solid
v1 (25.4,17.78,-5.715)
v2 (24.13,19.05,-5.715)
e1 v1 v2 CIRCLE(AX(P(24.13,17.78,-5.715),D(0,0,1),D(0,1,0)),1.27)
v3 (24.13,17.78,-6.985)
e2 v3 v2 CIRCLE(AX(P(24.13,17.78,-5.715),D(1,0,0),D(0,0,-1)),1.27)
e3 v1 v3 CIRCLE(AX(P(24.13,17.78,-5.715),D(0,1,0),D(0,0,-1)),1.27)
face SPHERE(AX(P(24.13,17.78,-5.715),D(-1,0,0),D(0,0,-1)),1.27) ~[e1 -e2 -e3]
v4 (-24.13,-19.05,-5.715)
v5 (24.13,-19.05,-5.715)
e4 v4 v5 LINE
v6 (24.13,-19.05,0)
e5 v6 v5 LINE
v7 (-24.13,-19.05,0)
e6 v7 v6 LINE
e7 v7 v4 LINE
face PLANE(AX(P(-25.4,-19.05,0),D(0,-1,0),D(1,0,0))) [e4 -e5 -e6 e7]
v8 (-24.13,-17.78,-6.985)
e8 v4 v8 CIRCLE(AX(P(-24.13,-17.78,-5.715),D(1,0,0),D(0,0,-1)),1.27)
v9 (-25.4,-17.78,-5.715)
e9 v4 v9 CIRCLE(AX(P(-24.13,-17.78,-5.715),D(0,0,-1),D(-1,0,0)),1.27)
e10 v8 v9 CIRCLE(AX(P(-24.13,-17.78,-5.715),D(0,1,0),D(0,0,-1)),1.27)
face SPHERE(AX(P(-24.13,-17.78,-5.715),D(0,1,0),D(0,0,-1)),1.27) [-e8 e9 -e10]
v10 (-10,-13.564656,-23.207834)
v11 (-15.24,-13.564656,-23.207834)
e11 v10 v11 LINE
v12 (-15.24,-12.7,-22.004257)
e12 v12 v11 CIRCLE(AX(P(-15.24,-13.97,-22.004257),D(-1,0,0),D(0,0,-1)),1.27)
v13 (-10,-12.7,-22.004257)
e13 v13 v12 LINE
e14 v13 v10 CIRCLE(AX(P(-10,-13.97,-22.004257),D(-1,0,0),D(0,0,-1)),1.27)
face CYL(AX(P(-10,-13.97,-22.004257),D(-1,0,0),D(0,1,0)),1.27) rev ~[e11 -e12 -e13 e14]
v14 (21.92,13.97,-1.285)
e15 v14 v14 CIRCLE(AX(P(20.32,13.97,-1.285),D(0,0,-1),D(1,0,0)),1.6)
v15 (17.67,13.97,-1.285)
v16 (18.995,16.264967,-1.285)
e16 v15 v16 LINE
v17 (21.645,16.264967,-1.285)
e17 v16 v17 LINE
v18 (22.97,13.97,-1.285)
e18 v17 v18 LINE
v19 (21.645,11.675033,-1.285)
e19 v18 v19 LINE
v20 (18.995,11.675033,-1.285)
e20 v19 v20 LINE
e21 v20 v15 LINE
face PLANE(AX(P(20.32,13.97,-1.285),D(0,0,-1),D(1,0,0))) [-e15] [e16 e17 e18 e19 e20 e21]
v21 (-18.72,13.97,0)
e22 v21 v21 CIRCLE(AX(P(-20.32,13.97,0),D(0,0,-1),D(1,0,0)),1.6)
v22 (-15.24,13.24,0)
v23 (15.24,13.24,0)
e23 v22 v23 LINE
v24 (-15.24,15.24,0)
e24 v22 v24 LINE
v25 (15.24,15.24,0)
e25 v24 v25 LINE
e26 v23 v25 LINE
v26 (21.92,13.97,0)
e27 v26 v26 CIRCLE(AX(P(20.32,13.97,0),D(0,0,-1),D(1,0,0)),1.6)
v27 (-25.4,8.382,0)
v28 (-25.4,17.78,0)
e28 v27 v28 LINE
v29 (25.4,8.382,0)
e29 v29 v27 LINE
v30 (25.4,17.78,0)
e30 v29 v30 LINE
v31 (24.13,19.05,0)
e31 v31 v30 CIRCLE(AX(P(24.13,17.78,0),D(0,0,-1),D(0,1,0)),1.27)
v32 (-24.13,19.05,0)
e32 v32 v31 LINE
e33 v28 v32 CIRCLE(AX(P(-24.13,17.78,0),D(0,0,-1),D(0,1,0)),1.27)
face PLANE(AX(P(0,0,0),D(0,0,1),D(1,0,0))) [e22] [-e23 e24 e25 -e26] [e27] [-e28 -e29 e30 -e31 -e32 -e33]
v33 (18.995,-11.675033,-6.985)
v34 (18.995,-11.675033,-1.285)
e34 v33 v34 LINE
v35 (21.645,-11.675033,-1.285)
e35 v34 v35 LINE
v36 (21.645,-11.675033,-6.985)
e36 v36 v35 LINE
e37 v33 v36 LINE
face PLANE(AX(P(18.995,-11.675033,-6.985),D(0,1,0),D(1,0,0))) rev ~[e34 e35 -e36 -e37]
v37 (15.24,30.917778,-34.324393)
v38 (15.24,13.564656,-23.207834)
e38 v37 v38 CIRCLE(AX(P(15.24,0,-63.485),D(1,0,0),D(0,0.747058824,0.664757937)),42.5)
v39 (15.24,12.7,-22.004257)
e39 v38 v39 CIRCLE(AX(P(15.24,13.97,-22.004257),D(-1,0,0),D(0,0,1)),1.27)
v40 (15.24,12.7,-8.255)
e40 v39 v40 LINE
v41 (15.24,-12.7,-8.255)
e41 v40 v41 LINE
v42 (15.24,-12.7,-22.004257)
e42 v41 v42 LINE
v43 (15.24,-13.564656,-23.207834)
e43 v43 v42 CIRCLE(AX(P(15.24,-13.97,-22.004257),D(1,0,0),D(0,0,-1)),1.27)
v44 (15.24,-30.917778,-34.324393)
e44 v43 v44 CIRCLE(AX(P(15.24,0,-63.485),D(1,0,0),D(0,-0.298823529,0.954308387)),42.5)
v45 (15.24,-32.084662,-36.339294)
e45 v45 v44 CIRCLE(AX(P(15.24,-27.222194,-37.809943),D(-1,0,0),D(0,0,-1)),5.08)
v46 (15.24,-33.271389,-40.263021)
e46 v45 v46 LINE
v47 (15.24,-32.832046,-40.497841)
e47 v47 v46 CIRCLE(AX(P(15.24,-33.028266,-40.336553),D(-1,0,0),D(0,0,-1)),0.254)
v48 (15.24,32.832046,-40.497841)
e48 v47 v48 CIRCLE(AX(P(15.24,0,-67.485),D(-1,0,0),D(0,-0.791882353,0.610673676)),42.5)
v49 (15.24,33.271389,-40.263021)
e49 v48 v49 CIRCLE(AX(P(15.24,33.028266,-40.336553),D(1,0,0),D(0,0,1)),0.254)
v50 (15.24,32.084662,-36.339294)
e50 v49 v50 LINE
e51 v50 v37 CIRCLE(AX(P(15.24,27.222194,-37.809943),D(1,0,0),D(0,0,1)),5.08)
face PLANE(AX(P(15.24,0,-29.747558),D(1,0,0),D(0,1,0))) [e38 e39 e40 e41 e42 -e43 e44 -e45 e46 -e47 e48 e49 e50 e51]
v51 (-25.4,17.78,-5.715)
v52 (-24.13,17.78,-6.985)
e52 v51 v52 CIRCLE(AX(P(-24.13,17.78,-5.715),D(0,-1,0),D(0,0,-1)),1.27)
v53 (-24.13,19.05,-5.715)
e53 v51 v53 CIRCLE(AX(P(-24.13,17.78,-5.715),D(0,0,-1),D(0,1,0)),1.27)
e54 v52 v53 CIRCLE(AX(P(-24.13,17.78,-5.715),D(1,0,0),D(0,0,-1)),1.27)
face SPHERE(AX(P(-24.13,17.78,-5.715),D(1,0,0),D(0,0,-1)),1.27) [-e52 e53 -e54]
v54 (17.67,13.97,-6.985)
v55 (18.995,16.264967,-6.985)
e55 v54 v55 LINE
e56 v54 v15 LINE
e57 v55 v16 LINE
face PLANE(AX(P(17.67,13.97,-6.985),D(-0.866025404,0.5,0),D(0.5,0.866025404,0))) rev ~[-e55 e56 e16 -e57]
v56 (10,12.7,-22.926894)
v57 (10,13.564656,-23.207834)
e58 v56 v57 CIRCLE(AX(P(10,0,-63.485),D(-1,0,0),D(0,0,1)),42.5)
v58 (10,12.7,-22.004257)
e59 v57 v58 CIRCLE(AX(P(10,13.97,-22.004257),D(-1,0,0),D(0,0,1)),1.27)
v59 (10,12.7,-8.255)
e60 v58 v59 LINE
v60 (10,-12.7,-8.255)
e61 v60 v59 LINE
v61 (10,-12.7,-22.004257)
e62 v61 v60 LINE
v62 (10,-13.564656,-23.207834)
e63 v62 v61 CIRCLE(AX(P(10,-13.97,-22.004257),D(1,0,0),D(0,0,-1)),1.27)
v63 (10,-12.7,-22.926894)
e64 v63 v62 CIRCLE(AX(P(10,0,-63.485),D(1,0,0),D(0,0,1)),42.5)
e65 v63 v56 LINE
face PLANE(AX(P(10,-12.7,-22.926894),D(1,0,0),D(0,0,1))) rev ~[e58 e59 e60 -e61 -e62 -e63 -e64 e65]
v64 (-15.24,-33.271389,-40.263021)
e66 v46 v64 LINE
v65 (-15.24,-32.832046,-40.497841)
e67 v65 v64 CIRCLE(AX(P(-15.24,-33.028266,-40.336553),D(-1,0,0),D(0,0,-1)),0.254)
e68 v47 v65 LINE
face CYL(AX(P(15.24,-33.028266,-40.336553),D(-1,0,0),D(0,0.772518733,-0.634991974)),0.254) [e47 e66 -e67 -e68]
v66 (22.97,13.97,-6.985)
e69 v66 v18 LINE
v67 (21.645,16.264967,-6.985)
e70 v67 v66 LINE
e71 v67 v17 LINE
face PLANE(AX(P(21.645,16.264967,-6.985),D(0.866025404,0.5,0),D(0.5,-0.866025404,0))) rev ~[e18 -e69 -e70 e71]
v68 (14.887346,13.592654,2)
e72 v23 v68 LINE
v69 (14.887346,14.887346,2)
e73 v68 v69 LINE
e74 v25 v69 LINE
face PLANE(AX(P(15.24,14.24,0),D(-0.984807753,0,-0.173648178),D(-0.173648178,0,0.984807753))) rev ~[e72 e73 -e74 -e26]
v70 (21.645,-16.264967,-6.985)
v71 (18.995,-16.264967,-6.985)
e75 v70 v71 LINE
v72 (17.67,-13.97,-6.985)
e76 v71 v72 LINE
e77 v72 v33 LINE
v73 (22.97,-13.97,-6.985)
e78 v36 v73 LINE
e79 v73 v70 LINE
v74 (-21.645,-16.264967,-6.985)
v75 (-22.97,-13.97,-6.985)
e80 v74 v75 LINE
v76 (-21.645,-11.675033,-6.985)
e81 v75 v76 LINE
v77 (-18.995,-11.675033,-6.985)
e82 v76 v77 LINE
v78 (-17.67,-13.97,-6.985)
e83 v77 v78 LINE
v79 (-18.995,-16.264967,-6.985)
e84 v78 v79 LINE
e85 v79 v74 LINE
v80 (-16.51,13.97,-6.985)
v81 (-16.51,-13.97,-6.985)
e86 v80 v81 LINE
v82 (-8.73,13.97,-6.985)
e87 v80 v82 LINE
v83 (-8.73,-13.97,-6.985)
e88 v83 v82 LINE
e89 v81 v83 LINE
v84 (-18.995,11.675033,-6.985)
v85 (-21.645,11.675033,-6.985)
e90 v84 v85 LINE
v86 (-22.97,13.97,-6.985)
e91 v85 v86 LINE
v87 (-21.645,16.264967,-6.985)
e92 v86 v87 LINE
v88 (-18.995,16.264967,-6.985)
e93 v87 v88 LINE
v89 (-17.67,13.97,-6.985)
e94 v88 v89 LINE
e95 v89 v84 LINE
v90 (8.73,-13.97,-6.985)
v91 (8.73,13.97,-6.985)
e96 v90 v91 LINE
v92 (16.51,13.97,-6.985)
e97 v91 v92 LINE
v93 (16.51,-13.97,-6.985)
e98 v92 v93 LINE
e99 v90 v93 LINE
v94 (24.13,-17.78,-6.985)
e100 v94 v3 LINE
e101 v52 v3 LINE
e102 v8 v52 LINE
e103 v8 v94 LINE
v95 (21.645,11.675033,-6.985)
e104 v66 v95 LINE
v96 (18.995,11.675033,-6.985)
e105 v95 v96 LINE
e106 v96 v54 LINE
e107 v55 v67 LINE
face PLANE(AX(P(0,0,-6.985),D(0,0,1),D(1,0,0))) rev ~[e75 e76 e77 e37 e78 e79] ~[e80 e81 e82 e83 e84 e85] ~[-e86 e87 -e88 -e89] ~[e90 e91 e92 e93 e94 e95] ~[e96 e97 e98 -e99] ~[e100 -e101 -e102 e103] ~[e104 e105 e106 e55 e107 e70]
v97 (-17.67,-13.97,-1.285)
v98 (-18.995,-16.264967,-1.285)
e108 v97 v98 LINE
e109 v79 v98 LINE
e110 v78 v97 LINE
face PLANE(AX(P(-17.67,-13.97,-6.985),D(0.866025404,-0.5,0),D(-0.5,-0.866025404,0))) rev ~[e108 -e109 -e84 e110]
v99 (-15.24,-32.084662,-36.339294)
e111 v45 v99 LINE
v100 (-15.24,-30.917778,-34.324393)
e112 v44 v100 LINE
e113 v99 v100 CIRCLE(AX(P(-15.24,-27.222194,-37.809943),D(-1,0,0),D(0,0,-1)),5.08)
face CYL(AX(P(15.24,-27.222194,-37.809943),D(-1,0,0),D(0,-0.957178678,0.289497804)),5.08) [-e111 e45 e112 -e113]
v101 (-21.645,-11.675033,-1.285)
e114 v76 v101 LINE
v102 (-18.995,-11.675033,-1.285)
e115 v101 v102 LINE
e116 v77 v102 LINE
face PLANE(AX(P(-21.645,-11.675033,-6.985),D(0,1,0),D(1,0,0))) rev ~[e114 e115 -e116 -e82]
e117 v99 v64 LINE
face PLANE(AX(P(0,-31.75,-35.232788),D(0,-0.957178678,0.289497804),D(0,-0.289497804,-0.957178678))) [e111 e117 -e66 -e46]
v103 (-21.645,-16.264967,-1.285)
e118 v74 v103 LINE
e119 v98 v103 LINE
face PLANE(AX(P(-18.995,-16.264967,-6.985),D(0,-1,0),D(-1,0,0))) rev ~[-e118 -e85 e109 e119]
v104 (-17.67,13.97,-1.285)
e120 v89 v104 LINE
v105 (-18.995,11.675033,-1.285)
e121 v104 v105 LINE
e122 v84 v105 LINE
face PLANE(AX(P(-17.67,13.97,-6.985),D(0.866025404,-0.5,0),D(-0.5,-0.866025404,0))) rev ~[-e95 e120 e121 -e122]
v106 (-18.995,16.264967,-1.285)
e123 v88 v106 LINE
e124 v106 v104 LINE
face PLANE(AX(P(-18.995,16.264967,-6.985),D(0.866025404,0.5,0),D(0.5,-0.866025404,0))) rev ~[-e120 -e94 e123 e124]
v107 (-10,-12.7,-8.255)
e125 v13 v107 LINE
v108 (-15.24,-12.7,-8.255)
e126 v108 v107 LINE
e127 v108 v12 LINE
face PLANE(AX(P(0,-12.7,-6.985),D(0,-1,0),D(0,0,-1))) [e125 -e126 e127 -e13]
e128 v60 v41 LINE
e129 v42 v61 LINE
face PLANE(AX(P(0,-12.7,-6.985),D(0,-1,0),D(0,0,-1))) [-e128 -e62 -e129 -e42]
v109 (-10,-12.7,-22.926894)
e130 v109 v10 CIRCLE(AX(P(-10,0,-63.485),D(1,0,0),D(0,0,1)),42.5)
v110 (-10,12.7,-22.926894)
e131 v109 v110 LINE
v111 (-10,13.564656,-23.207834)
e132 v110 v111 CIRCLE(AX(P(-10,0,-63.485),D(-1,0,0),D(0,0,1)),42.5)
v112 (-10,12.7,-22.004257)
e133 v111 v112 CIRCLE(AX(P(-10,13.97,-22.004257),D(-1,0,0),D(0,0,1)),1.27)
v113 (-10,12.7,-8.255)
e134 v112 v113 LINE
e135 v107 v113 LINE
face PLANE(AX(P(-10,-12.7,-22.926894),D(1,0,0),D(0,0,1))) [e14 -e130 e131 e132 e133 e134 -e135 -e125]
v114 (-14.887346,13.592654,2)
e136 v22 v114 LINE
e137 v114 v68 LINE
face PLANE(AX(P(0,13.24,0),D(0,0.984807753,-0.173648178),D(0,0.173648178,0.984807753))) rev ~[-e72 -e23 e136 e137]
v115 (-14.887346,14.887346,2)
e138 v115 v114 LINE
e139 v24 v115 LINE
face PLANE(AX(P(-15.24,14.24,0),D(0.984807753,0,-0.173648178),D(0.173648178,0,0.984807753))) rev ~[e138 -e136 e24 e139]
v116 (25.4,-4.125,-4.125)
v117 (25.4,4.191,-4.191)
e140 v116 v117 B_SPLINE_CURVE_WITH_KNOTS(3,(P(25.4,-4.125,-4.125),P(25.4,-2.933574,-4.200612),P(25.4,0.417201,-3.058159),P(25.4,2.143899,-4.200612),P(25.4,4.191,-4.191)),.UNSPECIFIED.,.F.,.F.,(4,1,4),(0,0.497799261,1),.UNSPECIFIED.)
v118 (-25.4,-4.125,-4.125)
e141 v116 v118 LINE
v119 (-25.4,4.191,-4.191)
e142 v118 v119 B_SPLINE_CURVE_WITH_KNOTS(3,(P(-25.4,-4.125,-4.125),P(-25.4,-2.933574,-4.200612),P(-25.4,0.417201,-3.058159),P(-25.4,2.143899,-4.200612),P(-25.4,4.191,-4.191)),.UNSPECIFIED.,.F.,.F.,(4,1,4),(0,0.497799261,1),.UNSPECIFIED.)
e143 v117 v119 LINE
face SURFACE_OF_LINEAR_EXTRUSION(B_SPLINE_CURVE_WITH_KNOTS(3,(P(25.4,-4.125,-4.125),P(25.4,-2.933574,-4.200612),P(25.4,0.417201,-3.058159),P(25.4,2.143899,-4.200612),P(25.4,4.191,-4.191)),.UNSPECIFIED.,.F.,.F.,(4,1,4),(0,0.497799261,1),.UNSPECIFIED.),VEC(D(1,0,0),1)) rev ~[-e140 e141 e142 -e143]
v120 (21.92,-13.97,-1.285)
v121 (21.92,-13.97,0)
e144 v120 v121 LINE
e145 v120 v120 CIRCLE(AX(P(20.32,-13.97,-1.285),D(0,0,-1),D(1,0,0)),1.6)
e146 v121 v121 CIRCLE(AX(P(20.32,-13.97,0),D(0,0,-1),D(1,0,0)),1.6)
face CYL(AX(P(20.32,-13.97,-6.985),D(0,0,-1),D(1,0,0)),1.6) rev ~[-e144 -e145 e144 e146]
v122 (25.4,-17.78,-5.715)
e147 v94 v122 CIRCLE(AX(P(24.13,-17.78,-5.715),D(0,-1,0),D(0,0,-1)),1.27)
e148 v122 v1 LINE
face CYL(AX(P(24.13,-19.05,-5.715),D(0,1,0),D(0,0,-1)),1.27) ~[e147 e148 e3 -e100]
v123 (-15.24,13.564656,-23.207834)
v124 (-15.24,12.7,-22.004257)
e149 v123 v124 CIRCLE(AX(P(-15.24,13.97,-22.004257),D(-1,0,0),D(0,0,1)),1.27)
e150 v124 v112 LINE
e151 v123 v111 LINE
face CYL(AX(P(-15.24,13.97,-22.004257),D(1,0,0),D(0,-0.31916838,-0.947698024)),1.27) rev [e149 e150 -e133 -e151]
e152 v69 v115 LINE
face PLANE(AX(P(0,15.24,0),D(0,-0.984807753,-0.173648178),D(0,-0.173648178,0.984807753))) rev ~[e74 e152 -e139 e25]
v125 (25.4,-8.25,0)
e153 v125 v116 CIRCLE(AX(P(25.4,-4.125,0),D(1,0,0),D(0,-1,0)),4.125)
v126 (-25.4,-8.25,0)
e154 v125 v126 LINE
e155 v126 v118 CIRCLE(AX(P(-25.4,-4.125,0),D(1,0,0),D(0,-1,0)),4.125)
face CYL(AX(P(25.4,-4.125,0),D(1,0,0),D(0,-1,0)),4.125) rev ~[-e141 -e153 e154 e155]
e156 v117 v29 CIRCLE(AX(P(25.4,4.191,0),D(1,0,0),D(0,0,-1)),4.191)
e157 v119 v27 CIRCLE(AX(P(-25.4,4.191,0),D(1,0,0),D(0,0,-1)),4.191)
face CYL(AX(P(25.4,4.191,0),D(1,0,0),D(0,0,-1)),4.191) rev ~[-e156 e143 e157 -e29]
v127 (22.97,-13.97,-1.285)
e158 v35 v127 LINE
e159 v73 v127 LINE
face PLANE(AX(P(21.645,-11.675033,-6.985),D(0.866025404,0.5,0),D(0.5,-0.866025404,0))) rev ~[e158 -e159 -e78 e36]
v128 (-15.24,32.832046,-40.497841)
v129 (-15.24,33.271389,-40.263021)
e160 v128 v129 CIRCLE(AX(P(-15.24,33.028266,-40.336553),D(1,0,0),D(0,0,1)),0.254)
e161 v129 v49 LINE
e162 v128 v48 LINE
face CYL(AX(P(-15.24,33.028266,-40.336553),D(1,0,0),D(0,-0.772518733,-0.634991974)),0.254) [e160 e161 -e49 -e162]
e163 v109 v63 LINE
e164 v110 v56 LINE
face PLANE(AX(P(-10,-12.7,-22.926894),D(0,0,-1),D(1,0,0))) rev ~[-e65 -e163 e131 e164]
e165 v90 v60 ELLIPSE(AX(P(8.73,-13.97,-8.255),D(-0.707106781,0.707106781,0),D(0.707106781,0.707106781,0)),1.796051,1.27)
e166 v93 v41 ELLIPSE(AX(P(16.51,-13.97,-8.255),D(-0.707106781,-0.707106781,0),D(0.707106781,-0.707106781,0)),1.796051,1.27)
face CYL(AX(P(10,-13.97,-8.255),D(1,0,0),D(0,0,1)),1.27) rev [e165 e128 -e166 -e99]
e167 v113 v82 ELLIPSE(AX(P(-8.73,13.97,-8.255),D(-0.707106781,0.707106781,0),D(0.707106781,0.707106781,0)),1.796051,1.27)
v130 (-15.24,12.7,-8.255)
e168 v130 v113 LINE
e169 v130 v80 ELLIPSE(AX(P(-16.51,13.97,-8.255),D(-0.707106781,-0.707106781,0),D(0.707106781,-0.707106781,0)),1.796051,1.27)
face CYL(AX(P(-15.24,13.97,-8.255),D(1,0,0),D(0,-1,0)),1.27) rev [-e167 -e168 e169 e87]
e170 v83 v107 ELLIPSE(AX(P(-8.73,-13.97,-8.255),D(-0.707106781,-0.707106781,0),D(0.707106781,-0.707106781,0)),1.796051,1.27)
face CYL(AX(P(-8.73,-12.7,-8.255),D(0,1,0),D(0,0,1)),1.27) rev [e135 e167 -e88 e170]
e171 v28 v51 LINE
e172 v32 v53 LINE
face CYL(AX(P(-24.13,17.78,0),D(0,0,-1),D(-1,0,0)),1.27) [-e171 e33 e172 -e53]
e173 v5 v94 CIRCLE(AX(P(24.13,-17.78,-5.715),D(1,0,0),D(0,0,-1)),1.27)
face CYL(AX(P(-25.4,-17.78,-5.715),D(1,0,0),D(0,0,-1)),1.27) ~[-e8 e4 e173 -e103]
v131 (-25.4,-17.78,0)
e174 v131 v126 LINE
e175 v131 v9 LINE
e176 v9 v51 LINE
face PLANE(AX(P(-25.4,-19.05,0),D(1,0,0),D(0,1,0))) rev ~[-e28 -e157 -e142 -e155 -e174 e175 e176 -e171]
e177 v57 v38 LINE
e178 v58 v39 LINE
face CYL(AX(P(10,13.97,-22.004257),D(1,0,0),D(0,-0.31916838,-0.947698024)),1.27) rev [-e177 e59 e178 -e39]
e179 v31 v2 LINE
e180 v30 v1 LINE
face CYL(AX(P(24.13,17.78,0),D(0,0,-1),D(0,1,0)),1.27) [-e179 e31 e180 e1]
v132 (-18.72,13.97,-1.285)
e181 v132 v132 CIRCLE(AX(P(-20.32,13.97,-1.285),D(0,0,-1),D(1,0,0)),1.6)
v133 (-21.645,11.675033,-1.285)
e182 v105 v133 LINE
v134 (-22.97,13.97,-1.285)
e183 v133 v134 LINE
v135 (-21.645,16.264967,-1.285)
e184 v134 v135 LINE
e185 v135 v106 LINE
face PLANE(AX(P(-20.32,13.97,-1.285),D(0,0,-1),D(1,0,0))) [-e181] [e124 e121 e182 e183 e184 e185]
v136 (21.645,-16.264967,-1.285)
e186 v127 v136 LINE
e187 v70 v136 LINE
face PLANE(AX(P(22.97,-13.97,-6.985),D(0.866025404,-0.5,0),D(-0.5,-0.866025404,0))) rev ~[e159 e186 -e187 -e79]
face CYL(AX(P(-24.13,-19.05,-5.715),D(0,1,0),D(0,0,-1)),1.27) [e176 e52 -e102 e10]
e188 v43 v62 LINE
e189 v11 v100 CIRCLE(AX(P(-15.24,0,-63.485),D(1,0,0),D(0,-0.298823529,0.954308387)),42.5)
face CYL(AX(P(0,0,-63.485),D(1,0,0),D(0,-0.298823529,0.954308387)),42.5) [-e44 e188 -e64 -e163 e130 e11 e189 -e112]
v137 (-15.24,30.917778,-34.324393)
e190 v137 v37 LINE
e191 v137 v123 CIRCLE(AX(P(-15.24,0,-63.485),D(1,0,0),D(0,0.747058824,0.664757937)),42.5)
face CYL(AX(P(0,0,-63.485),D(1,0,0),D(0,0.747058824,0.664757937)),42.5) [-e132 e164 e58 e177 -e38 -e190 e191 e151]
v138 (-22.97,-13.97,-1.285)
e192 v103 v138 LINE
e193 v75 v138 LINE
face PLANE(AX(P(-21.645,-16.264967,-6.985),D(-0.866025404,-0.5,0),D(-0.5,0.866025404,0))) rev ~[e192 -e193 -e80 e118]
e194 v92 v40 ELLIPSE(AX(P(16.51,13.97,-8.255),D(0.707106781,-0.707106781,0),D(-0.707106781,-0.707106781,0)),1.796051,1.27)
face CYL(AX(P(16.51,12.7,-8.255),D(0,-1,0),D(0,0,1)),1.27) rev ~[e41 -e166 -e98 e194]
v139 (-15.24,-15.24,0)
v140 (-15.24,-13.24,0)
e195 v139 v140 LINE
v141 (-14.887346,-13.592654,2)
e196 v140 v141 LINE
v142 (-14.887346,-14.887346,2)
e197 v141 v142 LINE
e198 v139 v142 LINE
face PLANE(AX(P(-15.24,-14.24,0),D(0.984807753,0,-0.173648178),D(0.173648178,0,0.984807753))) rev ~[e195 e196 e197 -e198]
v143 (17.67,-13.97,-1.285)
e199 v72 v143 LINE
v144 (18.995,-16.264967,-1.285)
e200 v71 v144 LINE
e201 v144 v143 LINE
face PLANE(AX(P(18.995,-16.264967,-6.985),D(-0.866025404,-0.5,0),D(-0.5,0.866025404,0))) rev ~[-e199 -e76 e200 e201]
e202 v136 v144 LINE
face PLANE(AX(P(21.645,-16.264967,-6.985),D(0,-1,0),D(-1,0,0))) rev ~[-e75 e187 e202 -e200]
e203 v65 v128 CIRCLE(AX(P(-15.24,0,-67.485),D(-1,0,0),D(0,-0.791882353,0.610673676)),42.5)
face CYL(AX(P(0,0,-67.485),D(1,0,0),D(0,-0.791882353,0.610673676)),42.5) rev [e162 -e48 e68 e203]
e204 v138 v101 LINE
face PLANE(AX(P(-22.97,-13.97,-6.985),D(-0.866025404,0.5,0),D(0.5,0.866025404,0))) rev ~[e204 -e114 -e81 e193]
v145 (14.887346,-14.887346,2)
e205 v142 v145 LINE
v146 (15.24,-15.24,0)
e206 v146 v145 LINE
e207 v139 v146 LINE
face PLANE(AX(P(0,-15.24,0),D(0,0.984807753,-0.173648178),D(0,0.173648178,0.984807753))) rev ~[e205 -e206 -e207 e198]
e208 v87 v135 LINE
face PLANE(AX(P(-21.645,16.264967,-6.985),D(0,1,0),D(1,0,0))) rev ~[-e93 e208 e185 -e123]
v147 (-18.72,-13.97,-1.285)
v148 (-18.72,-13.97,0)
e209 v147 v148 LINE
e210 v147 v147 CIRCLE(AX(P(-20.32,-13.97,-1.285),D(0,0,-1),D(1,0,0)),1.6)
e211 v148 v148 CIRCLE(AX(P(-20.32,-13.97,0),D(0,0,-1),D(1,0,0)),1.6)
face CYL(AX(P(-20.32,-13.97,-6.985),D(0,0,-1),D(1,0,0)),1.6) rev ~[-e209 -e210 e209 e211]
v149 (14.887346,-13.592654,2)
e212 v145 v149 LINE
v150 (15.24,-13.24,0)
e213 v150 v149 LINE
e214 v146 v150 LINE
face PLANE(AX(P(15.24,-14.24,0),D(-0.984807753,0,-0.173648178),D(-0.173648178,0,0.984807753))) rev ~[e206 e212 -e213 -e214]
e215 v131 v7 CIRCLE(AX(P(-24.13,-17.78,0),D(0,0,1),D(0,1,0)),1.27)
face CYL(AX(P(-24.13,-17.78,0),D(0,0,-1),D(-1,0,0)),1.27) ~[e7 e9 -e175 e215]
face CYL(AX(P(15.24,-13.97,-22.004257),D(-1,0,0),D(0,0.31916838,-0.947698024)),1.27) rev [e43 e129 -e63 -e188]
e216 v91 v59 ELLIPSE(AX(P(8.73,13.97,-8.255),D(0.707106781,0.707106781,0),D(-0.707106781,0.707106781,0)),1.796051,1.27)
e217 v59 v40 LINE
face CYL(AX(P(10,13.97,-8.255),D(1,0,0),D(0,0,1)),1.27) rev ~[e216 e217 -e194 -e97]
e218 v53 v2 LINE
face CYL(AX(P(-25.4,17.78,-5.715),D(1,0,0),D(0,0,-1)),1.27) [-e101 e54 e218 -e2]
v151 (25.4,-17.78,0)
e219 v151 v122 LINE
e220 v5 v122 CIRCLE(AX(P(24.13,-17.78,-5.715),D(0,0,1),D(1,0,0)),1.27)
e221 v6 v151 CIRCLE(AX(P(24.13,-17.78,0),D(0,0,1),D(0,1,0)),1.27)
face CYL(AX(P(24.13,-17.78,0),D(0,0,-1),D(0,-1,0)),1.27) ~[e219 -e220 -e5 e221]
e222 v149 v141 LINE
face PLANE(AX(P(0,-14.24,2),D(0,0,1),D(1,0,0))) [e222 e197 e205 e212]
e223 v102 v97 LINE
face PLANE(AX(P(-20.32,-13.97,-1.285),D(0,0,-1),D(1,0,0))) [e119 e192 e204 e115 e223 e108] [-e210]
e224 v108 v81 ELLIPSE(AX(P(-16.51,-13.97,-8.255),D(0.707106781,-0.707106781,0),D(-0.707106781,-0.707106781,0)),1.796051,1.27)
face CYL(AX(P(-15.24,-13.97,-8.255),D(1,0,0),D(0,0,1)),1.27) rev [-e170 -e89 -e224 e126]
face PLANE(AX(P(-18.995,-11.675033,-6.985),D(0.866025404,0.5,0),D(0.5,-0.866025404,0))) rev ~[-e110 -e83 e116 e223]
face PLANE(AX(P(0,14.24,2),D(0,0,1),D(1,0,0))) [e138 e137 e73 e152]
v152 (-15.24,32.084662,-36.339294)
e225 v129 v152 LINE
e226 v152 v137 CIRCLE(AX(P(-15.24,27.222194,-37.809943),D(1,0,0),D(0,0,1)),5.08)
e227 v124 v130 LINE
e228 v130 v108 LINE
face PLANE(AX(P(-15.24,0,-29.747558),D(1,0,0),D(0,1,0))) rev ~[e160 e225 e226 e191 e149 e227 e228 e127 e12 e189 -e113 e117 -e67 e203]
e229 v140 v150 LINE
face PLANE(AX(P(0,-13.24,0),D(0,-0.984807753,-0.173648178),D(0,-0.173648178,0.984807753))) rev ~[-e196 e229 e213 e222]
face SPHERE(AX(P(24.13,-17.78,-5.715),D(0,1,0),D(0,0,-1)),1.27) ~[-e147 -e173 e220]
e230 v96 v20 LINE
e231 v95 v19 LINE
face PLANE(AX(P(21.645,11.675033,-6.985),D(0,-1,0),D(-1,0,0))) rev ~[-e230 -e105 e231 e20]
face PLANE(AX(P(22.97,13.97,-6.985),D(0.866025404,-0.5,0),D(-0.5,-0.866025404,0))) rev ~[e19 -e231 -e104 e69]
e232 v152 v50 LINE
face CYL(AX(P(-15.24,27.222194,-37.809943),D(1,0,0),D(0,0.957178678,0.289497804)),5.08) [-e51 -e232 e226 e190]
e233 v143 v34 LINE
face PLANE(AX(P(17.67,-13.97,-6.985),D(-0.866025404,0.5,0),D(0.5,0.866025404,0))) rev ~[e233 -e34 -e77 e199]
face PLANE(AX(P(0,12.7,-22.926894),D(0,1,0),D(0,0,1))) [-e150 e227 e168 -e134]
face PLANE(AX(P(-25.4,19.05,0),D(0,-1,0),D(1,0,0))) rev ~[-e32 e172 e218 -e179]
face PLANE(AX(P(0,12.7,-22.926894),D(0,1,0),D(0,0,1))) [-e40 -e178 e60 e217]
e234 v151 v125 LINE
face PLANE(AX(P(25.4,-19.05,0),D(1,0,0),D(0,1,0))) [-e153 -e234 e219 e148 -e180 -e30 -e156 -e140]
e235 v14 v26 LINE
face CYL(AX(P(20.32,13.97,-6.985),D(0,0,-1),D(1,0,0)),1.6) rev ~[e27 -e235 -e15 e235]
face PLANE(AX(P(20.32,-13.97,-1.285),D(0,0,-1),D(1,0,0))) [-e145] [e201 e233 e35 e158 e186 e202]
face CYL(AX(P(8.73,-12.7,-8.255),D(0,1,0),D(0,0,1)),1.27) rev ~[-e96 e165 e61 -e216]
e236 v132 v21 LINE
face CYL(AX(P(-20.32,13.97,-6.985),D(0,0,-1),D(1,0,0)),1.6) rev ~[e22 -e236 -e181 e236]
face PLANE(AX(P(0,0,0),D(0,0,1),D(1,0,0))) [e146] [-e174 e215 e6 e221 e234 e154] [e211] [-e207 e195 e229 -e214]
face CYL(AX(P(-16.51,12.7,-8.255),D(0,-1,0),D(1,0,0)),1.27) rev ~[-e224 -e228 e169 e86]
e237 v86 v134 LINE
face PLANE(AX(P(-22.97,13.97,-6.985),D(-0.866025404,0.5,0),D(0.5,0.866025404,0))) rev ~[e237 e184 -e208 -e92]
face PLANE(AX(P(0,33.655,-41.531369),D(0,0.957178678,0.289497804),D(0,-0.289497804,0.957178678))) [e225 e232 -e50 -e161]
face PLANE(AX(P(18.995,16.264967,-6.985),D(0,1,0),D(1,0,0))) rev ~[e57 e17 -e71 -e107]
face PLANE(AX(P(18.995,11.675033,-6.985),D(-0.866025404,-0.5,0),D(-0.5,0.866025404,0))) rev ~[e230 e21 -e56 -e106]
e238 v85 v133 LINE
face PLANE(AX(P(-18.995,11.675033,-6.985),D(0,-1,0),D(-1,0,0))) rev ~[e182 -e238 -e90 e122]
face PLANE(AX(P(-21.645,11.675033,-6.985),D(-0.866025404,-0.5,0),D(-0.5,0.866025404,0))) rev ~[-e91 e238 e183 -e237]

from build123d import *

# Parameters (mm, degrees)
F1_W          = 50.8
F1_H          = 38.1
F2_DEPTH      = 6.985
F4_DEPTH      = 50.8
F6_DEPTH      = 15.24
F6_DEPTH_BACK = 15.24
F7_W          = 20
F7_H          = 15.9418935353
F8_DEPTH      = 25.4
F9_R          = 1.6
F10_DEPTH     = 25.4
F11_R         = 1.6
F12_DEPTH     = 5.7
F13_W         = 30.48
F13_H         = 2
F14_DEPTH     = 2
F14_TAPER     = 10
F15_F1_R      = 0.254
F15_F2_R      = 0.254
F16_R         = 5.08
F17_R         = 1.27


# Not quite as in the source:
# - two fillets or chamfers of one size are made in one step


with BuildPart() as f2:
    # F1 (on Top) → F2 (new body)
    with BuildSketch(Plane.XY):
        Rectangle(F1_W, F1_H)
    extrude(amount=-F2_DEPTH)

    # F3 (on face) → F4 (cut, through all)
    with BuildSketch(Plane.YZ.offset(25.4)):
        with BuildLine():
            add(Edge.make_bspline(
                [(-4.125, 4.125), (-2.4255892558, 4.1137489608), (-0.0276085061, 2.971292738), (2.5249406681, 4.1137612248), (4.191, 4.191)],
                knots=[0, 0, 0, 0, 0.4977710734, 1, 1, 1, 1], degree=3))
            ThreePointArc((-4.125, 4.125), (-7.0418154724, 2.9168154724), (-8.25, 0))
            ThreePointArc((-8.25, 0), (-7.0418154724, -2.9168154724), (-4.125, -4.125))
            add(Edge.make_bspline(
                [(-4.125, -4.125), (-2.9335741419, -4.2006121948), (0.4172014685, -3.0581585459), (2.1438994445, -4.2006121948), (4.191, -4.191)],
                knots=[0, 0, 0, 0, 0.497799261, 1, 1, 1, 1], degree=3))
            ThreePointArc((4.191, -4.191), (7.15448452, -2.96348452), (8.382, 0))
            ThreePointArc((8.382, 0), (7.15448452, 2.96348452), (4.191, 4.191))
        make_face()
    extrude(amount=-F4_DEPTH, mode=Mode.SUBTRACT)

    # F5 (on Right) → F6 (join, two sides)
    with BuildSketch(Plane.YZ) as f6_sk:
        with BuildLine():
            ThreePointArc((-33.655, -41.5313687512), (0, -24.985), (33.655, -41.5313687512))
            Line((33.655, -41.5313687512), (31.75, -35.2327876972))
            ThreePointArc((31.75, -35.2327876972), (23.0609926669, -27.7856916423), (12.7, -22.9268935353))
            ThreePointArc((12.7, -22.9268935353), (0, -20.985), (-12.7, -22.9268935353))
            ThreePointArc((-12.7, -22.9268935353), (-23.0609926669, -27.7856916423), (-31.75, -35.2327876972))
            Line((-31.75, -35.2327876972), (-33.655, -41.5313687512))
        make_face()
        with BuildLine():
            ThreePointArc((-12.7, -22.9268935353), (0, -20.985), (12.7, -22.9268935353))
            Line((12.7, -22.9268935353), (12.7, -6.985))
            Line((12.7, -6.985), (-12.7, -6.985))
            Line((-12.7, -6.985), (-12.7, -22.9268935353))
        make_face()
    extrude(amount=F6_DEPTH)
    extrude(f6_sk.sketch, amount=-F6_DEPTH_BACK)

    # F7 (on face) → F8 (cut)
    with BuildSketch(Plane.XZ.offset(12.7)):
        with Locations((0, -14.9559467677)):
            Rectangle(F7_W, F7_H)
    extrude(amount=-F8_DEPTH, mode=Mode.SUBTRACT)

    # F9 (on face) → F10 (cut)
    with BuildSketch(Plane(origin=(0, 0, -6.985), x_dir=(1, 0, 0), z_dir=(0, 0, -1))):
        with Locations((20.32, -13.97)):
            Circle(F9_R)
        with Locations((-20.32, -13.97)):
            Circle(F9_R)
        with Locations((-20.32, 13.97)):
            Circle(F9_R)
        with Locations((20.32, 13.97)):
            Circle(F9_R)
    extrude(amount=-F10_DEPTH, mode=Mode.SUBTRACT)

    # F11 (on face) → F12 (cut)
    with BuildSketch(Plane(origin=(0, 0, -6.985), x_dir=(1, 0, 0), z_dir=(0, 0, -1))):
        Polygon((21.645, -16.26496732), (22.97, -13.97), (21.645, -11.67503268), (18.995, -11.67503268), (17.67, -13.97), (18.995, -16.26496732), align=None)
        with Locations((20.32, -13.97)):
            Circle(F11_R, mode=Mode.SUBTRACT)
        Polygon((-18.995, -11.67503268), (-21.645, -11.67503268), (-22.97, -13.97), (-21.645, -16.26496732), (-18.995, -16.26496732), (-17.67, -13.97), align=None)
        with Locations((-20.32, -13.97)):
            Circle(F11_R, mode=Mode.SUBTRACT)
        Polygon((-18.995, 11.67503268), (-17.67, 13.97), (-18.995, 16.26496732), (-21.645, 16.26496732), (-22.97, 13.97), (-21.645, 11.67503268), align=None)
        with Locations((-20.32, 13.97)):
            Circle(F11_R, mode=Mode.SUBTRACT)
        Polygon((18.995, 11.67503268), (21.645, 11.67503268), (22.97, 13.97), (21.645, 16.26496732), (18.995, 16.26496732), (17.67, 13.97), align=None)
        with Locations((20.32, 13.97)):
            Circle(F11_R, mode=Mode.SUBTRACT)
    extrude(amount=-F12_DEPTH, mode=Mode.SUBTRACT)

    # F13 (on face) → F14 (join)
    with BuildSketch(Plane.XY):
        with Locations((0, 14.24)):
            Rectangle(F13_W, F13_H)
        with Locations((0, -14.24)):
            Rectangle(F13_W, F13_H)
    extrude(amount=F14_DEPTH, taper=F14_TAPER)

    # F15: fillet of radius 0.254 on 2 edges, made by hand

    # F15_f1
    f15_f1_edges = [f2.edges().sort_by_distance(p)[0] for p in [
        (0, -33.655, -41.5313687512),
    ]]
    fillet(f15_f1_edges, radius=F15_F1_R)

    # F15_f2
    f15_f2_edges = [f2.edges().sort_by_distance(p)[0] for p in [
        (0, 33.655, -41.5313687512),
    ]]
    fillet(f15_f2_edges, radius=F15_F2_R)

    # F16
    f16_edges = [f2.edges().sort_by_distance(p)[0] for p in [
        (0, 31.75, -35.232788),
        (0, -31.75, -35.232788),
    ]]
    fillet(f16_edges, radius=F16_R)

    # F17
    f17_edges = [f2.edges().sort_by_distance(p)[0] for p in [
        (-15.24, 0, -6.985),
        (12.62, 12.7, -22.926894),
        (-12.62, 12.7, -22.926894),
        (-12.62, 12.7, -6.985),
        (0, 19.05, -6.985),
        (25.4, 0, -6.985),
        (-25.4, 0, -6.985),
        (0, -19.05, -6.985),
        (-12.62, -12.7, -6.985),
        (-10, 0, -6.985),
        (12.62, -12.7, -6.985),
        (15.24, 0, -6.985),
        (10, 0, -6.985),
        (12.62, 12.7, -6.985),
        (-12.62, -12.7, -22.926894),
        (12.62, -12.7, -22.926894),
        (25.4, 19.05, -3.4925),
        (-25.4, 19.05, -3.4925),
        (25.4, -19.05, -3.4925),
        (-25.4, -19.05, -3.4925),
    ]]
    fillet(f17_edges, radius=F17_R)


solid = f2.part
